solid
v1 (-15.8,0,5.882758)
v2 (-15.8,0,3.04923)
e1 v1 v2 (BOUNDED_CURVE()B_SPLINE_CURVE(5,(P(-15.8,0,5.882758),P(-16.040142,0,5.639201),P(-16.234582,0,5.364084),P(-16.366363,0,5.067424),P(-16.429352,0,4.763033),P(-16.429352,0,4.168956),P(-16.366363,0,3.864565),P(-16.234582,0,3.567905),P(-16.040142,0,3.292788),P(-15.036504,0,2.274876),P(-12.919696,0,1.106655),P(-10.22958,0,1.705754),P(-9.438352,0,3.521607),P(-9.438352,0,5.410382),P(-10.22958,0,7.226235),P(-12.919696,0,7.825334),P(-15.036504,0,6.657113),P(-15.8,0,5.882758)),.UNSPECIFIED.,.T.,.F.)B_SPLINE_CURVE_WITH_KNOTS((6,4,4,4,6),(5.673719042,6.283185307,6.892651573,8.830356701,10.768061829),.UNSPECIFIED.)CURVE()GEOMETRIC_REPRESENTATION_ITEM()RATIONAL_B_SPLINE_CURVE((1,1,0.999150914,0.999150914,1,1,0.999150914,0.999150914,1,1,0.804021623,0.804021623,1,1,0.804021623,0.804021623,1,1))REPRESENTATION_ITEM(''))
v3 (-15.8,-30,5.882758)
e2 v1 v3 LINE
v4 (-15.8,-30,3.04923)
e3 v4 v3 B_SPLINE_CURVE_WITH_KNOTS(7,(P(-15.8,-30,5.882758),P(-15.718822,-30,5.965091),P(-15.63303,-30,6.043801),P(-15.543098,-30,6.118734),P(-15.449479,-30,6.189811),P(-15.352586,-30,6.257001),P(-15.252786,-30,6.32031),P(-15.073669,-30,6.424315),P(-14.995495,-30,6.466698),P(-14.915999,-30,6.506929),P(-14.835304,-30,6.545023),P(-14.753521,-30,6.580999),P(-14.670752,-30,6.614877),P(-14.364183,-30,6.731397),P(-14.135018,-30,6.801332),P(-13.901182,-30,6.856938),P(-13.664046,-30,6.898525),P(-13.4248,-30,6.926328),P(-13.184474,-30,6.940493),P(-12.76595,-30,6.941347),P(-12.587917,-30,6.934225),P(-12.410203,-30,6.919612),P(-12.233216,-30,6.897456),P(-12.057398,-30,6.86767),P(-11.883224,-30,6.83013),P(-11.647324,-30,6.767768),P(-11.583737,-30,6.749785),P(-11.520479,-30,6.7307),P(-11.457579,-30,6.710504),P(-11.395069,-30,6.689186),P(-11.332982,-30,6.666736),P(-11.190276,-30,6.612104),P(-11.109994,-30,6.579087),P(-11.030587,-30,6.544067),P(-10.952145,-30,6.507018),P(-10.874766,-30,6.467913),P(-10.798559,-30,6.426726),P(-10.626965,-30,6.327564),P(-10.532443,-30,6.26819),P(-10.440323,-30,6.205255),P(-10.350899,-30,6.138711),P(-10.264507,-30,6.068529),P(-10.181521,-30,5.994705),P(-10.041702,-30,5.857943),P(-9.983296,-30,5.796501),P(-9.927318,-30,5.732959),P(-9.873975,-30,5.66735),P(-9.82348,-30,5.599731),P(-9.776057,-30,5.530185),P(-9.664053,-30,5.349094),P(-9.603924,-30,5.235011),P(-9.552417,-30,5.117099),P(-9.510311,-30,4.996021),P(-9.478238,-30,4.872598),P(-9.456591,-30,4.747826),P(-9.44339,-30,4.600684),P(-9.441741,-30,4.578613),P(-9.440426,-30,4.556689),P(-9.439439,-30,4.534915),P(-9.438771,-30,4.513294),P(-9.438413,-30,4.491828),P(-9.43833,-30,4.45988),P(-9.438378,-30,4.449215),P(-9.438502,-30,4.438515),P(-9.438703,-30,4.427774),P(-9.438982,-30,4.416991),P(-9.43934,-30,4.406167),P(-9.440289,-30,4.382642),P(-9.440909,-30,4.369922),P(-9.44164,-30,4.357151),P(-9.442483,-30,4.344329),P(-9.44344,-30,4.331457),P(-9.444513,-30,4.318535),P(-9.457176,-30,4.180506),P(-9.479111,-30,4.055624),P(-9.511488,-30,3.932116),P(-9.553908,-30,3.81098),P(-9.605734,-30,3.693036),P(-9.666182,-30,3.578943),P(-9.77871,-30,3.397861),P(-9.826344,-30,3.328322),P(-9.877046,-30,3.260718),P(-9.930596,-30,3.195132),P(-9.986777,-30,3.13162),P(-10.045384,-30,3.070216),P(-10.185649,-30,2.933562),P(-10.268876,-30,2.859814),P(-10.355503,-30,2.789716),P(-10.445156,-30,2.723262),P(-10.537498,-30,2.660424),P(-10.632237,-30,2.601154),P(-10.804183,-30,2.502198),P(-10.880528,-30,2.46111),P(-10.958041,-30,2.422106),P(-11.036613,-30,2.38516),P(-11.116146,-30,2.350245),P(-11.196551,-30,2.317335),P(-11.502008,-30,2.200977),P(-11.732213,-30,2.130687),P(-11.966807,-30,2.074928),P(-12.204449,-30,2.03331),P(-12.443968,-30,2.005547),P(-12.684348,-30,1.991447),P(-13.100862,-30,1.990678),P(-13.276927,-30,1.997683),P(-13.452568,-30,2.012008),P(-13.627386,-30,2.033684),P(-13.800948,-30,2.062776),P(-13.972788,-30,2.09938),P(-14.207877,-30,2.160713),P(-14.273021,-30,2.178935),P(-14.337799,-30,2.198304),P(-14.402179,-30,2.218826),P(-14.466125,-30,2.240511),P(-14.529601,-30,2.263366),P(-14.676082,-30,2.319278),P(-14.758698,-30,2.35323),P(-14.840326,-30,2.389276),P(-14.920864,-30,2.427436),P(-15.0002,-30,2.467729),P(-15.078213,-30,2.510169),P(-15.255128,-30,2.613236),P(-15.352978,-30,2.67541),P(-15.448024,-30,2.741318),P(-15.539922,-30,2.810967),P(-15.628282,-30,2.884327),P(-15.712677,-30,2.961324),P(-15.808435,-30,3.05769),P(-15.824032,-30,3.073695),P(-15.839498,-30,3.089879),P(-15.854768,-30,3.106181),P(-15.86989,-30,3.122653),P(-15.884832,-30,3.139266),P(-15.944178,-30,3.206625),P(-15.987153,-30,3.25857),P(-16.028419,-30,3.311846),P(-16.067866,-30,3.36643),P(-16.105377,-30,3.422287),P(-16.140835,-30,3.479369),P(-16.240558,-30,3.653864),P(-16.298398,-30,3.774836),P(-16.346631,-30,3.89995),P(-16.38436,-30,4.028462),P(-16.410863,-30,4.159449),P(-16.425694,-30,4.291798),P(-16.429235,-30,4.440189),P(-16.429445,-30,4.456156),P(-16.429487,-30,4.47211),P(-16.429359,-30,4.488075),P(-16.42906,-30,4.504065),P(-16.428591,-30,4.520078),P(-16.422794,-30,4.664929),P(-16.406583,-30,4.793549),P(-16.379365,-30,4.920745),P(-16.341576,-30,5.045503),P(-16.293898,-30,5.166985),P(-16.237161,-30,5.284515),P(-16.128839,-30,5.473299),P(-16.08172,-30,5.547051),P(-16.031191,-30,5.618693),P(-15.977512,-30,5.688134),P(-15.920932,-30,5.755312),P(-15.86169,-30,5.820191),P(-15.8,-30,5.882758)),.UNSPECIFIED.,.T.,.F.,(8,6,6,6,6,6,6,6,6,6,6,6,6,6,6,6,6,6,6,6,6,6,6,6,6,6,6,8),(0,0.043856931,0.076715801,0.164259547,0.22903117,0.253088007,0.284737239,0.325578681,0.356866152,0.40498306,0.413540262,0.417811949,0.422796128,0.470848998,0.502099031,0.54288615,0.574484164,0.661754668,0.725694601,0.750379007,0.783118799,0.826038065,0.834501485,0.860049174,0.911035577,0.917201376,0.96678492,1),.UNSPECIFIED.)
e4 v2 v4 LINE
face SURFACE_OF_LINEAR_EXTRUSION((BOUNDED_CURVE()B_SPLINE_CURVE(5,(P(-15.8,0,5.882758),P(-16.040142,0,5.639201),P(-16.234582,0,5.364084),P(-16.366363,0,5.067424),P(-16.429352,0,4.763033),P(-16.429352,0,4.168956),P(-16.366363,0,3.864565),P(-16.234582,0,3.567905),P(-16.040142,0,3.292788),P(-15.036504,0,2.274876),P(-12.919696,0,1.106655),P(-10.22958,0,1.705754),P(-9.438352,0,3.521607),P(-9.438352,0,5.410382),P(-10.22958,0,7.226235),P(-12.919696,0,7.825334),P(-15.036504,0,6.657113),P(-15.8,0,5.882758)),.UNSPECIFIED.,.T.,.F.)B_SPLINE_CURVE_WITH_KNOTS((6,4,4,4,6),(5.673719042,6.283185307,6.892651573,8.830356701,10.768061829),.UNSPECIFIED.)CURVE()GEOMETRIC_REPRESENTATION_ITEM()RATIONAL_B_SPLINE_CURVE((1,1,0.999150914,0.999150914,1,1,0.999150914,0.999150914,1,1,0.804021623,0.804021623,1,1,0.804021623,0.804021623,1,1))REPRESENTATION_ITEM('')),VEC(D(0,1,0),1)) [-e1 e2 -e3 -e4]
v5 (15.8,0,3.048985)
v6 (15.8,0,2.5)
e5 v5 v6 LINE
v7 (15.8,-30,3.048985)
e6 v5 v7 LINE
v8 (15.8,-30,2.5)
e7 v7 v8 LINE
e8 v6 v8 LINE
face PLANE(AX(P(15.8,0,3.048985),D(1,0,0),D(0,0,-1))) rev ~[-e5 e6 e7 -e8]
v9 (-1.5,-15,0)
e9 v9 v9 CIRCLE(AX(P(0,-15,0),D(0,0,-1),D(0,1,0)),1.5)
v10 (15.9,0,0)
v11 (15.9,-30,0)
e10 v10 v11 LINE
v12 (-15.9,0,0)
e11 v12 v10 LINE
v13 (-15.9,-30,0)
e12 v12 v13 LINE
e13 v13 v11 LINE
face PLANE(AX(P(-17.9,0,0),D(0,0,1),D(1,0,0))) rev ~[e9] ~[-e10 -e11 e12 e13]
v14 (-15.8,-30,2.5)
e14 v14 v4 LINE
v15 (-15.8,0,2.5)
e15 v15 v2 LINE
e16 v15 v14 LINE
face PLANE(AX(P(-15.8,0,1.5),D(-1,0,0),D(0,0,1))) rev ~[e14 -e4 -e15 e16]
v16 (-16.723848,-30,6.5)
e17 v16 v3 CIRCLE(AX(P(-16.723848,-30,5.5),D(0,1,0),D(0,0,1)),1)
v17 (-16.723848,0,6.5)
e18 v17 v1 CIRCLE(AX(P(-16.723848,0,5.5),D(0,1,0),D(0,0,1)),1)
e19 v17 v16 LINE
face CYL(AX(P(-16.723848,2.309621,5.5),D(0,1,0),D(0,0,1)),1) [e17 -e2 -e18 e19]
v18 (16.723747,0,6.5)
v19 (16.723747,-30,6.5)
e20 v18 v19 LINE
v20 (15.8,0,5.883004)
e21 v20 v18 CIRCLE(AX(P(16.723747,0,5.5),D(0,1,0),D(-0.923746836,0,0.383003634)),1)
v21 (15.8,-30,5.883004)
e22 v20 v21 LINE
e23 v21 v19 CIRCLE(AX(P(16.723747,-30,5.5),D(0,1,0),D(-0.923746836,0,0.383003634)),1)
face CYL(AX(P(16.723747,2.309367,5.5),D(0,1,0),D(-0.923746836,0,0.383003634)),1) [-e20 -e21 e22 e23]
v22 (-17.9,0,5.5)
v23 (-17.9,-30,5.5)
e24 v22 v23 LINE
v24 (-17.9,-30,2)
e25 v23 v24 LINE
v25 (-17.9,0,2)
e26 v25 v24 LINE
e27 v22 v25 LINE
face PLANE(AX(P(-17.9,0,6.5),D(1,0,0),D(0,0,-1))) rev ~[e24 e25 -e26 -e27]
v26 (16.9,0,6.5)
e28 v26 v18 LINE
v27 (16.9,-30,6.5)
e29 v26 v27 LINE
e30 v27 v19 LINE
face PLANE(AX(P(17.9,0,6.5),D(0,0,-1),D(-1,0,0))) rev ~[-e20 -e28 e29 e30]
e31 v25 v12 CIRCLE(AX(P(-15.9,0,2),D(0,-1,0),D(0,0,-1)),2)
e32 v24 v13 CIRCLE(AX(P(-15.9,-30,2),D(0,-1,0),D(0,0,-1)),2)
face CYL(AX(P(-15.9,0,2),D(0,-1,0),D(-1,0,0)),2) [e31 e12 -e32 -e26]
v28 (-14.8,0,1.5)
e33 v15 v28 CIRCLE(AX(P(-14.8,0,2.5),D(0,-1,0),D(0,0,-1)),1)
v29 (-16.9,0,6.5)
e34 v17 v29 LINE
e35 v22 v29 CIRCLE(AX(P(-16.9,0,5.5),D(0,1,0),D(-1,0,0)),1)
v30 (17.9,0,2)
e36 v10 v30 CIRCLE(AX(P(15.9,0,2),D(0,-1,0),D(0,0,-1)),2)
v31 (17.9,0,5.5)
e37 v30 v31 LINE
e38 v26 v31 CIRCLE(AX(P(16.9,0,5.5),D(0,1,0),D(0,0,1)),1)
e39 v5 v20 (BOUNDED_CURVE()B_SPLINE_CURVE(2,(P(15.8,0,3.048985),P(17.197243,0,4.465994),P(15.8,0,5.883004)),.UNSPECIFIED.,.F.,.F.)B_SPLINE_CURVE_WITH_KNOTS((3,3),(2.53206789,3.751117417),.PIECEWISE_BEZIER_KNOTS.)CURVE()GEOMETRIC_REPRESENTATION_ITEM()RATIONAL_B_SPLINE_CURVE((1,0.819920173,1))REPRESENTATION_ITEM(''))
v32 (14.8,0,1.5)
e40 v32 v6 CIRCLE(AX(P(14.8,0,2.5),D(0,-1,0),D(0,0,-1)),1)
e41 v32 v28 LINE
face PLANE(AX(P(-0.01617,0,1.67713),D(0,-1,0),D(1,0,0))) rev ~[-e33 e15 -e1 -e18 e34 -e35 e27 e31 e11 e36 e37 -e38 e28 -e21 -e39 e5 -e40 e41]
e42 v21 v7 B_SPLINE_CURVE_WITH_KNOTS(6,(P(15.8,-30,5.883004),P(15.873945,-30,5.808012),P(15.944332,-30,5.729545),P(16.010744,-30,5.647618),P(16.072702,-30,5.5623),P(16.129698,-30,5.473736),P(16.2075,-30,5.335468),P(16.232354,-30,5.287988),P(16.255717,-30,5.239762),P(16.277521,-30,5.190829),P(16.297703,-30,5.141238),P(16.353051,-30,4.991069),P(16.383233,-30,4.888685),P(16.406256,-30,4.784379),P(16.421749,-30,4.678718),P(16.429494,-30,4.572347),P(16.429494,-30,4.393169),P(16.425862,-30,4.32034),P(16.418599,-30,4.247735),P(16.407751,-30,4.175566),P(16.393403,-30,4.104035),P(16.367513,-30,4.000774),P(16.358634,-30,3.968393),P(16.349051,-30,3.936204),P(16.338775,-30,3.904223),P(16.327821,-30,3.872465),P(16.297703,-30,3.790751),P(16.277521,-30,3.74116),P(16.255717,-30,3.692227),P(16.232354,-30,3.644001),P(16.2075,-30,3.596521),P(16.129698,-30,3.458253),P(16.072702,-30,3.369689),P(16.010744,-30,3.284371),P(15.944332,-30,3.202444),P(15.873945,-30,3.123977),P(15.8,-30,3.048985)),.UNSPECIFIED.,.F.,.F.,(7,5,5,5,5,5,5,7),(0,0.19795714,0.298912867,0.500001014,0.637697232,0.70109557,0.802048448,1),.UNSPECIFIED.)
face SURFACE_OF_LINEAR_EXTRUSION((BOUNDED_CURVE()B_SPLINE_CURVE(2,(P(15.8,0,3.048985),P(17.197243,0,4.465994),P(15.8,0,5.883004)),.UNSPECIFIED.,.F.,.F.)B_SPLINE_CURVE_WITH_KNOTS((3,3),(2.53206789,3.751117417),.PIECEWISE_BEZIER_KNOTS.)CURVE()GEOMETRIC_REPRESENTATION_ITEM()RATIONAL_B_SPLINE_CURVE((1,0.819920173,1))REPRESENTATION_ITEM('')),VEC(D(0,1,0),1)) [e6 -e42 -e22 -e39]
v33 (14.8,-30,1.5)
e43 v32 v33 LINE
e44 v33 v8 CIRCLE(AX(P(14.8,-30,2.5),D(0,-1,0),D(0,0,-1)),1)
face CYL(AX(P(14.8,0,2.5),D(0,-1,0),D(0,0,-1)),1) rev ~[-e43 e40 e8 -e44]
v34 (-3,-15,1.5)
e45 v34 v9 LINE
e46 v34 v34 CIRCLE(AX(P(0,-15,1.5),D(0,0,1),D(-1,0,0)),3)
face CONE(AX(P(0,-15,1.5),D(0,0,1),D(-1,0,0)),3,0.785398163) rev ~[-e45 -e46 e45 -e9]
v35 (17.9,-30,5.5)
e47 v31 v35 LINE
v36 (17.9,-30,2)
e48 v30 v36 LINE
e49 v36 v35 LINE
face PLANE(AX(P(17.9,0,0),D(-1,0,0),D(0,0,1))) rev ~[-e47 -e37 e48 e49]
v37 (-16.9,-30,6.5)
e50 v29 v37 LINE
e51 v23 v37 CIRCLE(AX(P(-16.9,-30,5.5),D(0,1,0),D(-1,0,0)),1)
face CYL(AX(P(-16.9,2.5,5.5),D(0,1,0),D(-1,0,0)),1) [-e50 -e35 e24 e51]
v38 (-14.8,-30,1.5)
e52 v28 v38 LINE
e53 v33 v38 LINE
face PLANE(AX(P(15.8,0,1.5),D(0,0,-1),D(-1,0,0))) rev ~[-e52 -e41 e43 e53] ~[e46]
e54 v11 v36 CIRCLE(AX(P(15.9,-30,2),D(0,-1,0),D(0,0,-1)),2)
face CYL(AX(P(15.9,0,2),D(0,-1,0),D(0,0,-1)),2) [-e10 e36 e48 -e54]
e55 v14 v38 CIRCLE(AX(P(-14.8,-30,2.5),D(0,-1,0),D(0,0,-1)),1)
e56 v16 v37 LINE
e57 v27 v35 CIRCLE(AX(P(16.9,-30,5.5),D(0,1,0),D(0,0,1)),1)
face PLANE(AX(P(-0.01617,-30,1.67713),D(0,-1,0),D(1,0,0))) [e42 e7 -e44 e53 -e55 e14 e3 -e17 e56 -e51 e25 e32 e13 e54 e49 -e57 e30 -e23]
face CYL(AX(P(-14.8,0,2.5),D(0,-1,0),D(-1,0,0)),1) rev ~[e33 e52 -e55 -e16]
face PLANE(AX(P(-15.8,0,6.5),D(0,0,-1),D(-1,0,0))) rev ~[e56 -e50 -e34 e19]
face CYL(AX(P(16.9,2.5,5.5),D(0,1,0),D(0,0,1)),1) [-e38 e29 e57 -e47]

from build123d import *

# Parameters (mm, degrees)
F1_DEPTH       = 30
F3_D           = 3
F3_CSINK_D     = 6
F3_CSINK_ANGLE = 90
F4_DEPTH       = 30.0010001
F5_T1_DEPTH    = 35
F5_T3_DEPTH    = 34.6192422485
F5_T5_DEPTH    = 34.6187341795
F6_R           = 1
F7_R           = 2


# Not quite as in the source:
# - a fillet or chamfer that OpenCascade refuses, or shapes differently, is made with other operations: its cross-section is extruded or revolved along the edge and cut away or added


with BuildPart() as f1:
    # F0 (on Front) → F1 (new body)
    with BuildSketch(Plane.XZ):
        with BuildLine():
            Line((-17.9, 6.5), (-17.9, 0))
            Line((-17.9, 0), (17.9, 0))
            Line((17.9, 0), (17.9, 6.5))
            Line((17.9, 6.5), (15.8, 6.5))
            Line((15.8, 6.5), (15.8, 5.8830036334))
            add(Edge.make_bspline(
                [(15.8, 3.048985269), (17.1972432804, 4.4659944512), (15.8, 5.8830036334)],
                knots=[2.53206789, 2.53206789, 2.53206789, 3.7511174172, 3.7511174172, 3.7511174172], degree=2, weights=[1, 0.8199201727, 1]))
            Line((15.8, 3.048985269), (15.8, 1.5))
            Line((15.8, 1.5), (8, 1.5))
            Line((8, 1.5), (-8, 1.5))
            Line((-8, 1.5), (-15.8, 1.5))
            Line((-15.8, 1.5), (-15.8, 3.0492304381))
            add(Edge.make_bspline(
                [(-16.4293519812, 4.4659944512), (-16.4293519812, 3.687532865), (-15.8, 3.0492304381)],
                knots=[0, 0, 0, 0.6094662657, 0.6094662657, 0.6094662657], degree=2, weights=[1, 0.953927057, 1]))
            add(Edge.make_bspline(
                [(-15.8, 5.8827584643), (-16.4293519812, 5.2444560374), (-16.4293519812, 4.4659944512)],
                knots=[5.6737190415, 5.6737190415, 5.6737190415, 6.2831853072, 6.2831853072, 6.2831853072], degree=2, weights=[1, 0.953927057, 1]))
            Line((-15.8, 5.8827584643), (-15.8, 6.5))
            Line((-15.8, 6.5), (-17.9, 6.5))
        make_face()
        with BuildLine():
            add(Edge.make_bspline(
                [(-15.8, 3.0492304381), (-9.4383519812, -3.4028909356), (-9.4383519812, 4.4659944512), (-9.4383519812, 12.334879838), (-15.8, 5.8827584643)],
                knots=[0.6094662657, 0.6094662657, 0.6094662657, 3.1415926536, 3.1415926536, 5.6737190415, 5.6737190415, 5.6737190415], degree=2, weights=[1, 0.3000386141, 1, 0.3000386141, 1]))
            Line((-15.8, 5.8827584643), (-15.8, 3.0492304381))
        make_face()
        with BuildLine():
            Line((-15.8, 3.0492304381), (-15.8, 5.8827584643))
            add(Edge.make_bspline(
                [(-15.8, 5.8827584643), (-16.4293519812, 5.2444560374), (-16.4293519812, 4.4659944512)],
                knots=[5.6737190415, 5.6737190415, 5.6737190415, 6.2831853072, 6.2831853072, 6.2831853072], degree=2, weights=[1, 0.953927057, 1]))
            add(Edge.make_bspline(
                [(-16.4293519812, 4.4659944512), (-16.4293519812, 3.687532865), (-15.8, 3.0492304381)],
                knots=[0, 0, 0, 0.6094662657, 0.6094662657, 0.6094662657], degree=2, weights=[1, 0.953927057, 1]))
        make_face()
        with BuildLine():
            add(Edge.make_bspline(
                [(15.8, 3.048985269), (17.1972432804, 4.4659944512), (15.8, 5.8830036334)],
                knots=[2.53206789, 2.53206789, 2.53206789, 3.7511174172, 3.7511174172, 3.7511174172], degree=2, weights=[1, 0.8199201727, 1]))
            Line((15.8, 5.8830036334), (15.8, 3.048985269))
        make_face()
        with BuildLine():
            Line((15.8, 3.048985269), (15.8, 5.8830036334))
            add(Edge.make_bspline(
                [(15.8, 5.8830036334), (9.4382216203, 12.3347779991), (9.4382216203, 4.4659944512)],
                knots=[3.7511174172, 3.7511174172, 3.7511174172, 6.2831853072, 6.2831853072, 6.2831853072], degree=2, weights=[1, 0.3000665154, 1]))
            add(Edge.make_bspline(
                [(9.4382216203, 4.4659944512), (9.4382216203, -3.4027890967), (15.8, 3.048985269)],
                knots=[0, 0, 0, 2.53206789, 2.53206789, 2.53206789], degree=2, weights=[1, 0.3000665154, 1]))
        make_face()
    extrude(amount=F1_DEPTH)

    # F3 (through all)
    with Locations(Plane.XY.offset(1.5)):
        with Locations((0, -15)):
            CounterSinkHole(F3_D / 2, F3_CSINK_D / 2, counter_sink_angle=F3_CSINK_ANGLE)

    # F0 (on Front) → F4 (cut, through all)
    with BuildSketch(Plane.XZ):
        with BuildLine():
            Line((15.8, 3.048985269), (15.8, 5.8830036334))
            add(Edge.make_bspline(
                [(15.8, 5.8830036334), (9.4382216203, 12.3347779991), (9.4382216203, 4.4659944512)],
                knots=[3.7511174172, 3.7511174172, 3.7511174172, 6.2831853072, 6.2831853072, 6.2831853072], degree=2, weights=[1, 0.3000665154, 1]))
            add(Edge.make_bspline(
                [(9.4382216203, 4.4659944512), (9.4382216203, -3.4027890967), (15.8, 3.048985269)],
                knots=[0, 0, 0, 2.53206789, 2.53206789, 2.53206789], degree=2, weights=[1, 0.3000665154, 1]))
        make_face()
        with BuildLine():
            add(Edge.make_bspline(
                [(15.8, 3.048985269), (17.1972432804, 4.4659944512), (15.8, 5.8830036334)],
                knots=[2.53206789, 2.53206789, 2.53206789, 3.7511174172, 3.7511174172, 3.7511174172], degree=2, weights=[1, 0.8199201727, 1]))
            Line((15.8, 5.8830036334), (15.8, 3.048985269))
        make_face()
        with BuildLine():
            add(Edge.make_bspline(
                [(-15.8, 3.0492304381), (-9.4383519812, -3.4028909356), (-9.4383519812, 4.4659944512), (-9.4383519812, 12.334879838), (-15.8, 5.8827584643)],
                knots=[0.6094662657, 0.6094662657, 0.6094662657, 3.1415926536, 3.1415926536, 5.6737190415, 5.6737190415, 5.6737190415], degree=2, weights=[1, 0.3000386141, 1, 0.3000386141, 1]))
            Line((-15.8, 5.8827584643), (-15.8, 3.0492304381))
        make_face()
        with BuildLine():
            Line((-15.8, 3.0492304381), (-15.8, 5.8827584643))
            add(Edge.make_bspline(
                [(-15.8, 5.8827584643), (-16.4293519812, 5.2444560374), (-16.4293519812, 4.4659944512)],
                knots=[5.6737190415, 5.6737190415, 5.6737190415, 6.2831853072, 6.2831853072, 6.2831853072], degree=2, weights=[1, 0.953927057, 1]))
            add(Edge.make_bspline(
                [(-16.4293519812, 4.4659944512), (-16.4293519812, 3.687532865), (-15.8, 3.0492304381)],
                knots=[0, 0, 0, 0.6094662657, 0.6094662657, 0.6094662657], degree=2, weights=[1, 0.953927057, 1]))
        make_face()
    extrude(amount=F4_DEPTH, mode=Mode.SUBTRACT)

    # F5: fillet of radius 1 on 4 edges, made by hand

    # F5_s2 → F5_t1 (cut)
    with BuildSketch(Plane.XZ.offset(-2.5)):
        with BuildLine():
            ThreePointArc((-17.9, 5.5), (-17.6071067812, 6.2071067812), (-16.9, 6.5))
            Line((-16.9, 6.5), (-17.9, 6.5))
            Line((-17.9, 6.5), (-17.9, 5.5))
        make_face()
        with BuildLine():
            ThreePointArc((16.9, 6.5), (17.6071067812, 6.2071067812), (17.9, 5.5))
            Line((17.9, 5.5), (17.9, 6.5))
            Line((17.9, 6.5), (16.9, 6.5))
        make_face()
    extrude(amount=F5_T1_DEPTH, mode=Mode.SUBTRACT)

    # F5_s4 → F5_t3 (cut)
    with BuildSketch(Plane.XZ.offset(-2.3096211243)):
        with BuildLine():
            ThreePointArc((-16.7238484497, 6.5), (-16.1683119812, 6.331492172), (-15.8, 5.8827584643))
            Line((-15.8, 5.8827584643), (-15.8, 6.5))
            Line((-15.8, 6.5), (-16.7238484497, 6.5))
        make_face()
    extrude(amount=F5_T3_DEPTH, mode=Mode.SUBTRACT)

    # F5_s6 → F5_t5 (cut)
    with BuildSketch(Plane.XZ.offset(-2.3093670897)):
        with BuildLine():
            ThreePointArc((15.8, 5.8830036334), (16.1683207082, 6.3315658823), (16.7237468359, 6.5))
            Line((16.7237468359, 6.5), (15.8, 6.5))
            Line((15.8, 6.5), (15.8, 5.8830036334))
        make_face()
    extrude(amount=F5_T5_DEPTH, mode=Mode.SUBTRACT)

    # F6
    f6_edges = [f1.edges().sort_by_distance(p)[0] for p in [
        (-15.8, -15, 1.5),
        (15.8, -15, 1.5),
    ]]
    fillet(f6_edges, radius=F6_R)

    # F7
    f7_edges = [f1.edges().sort_by_distance(p)[0] for p in [
        (-17.9, -15, 0),
        (17.9, -15, 0),
    ]]
    fillet(f7_edges, radius=F7_R)


solid = f1.part
